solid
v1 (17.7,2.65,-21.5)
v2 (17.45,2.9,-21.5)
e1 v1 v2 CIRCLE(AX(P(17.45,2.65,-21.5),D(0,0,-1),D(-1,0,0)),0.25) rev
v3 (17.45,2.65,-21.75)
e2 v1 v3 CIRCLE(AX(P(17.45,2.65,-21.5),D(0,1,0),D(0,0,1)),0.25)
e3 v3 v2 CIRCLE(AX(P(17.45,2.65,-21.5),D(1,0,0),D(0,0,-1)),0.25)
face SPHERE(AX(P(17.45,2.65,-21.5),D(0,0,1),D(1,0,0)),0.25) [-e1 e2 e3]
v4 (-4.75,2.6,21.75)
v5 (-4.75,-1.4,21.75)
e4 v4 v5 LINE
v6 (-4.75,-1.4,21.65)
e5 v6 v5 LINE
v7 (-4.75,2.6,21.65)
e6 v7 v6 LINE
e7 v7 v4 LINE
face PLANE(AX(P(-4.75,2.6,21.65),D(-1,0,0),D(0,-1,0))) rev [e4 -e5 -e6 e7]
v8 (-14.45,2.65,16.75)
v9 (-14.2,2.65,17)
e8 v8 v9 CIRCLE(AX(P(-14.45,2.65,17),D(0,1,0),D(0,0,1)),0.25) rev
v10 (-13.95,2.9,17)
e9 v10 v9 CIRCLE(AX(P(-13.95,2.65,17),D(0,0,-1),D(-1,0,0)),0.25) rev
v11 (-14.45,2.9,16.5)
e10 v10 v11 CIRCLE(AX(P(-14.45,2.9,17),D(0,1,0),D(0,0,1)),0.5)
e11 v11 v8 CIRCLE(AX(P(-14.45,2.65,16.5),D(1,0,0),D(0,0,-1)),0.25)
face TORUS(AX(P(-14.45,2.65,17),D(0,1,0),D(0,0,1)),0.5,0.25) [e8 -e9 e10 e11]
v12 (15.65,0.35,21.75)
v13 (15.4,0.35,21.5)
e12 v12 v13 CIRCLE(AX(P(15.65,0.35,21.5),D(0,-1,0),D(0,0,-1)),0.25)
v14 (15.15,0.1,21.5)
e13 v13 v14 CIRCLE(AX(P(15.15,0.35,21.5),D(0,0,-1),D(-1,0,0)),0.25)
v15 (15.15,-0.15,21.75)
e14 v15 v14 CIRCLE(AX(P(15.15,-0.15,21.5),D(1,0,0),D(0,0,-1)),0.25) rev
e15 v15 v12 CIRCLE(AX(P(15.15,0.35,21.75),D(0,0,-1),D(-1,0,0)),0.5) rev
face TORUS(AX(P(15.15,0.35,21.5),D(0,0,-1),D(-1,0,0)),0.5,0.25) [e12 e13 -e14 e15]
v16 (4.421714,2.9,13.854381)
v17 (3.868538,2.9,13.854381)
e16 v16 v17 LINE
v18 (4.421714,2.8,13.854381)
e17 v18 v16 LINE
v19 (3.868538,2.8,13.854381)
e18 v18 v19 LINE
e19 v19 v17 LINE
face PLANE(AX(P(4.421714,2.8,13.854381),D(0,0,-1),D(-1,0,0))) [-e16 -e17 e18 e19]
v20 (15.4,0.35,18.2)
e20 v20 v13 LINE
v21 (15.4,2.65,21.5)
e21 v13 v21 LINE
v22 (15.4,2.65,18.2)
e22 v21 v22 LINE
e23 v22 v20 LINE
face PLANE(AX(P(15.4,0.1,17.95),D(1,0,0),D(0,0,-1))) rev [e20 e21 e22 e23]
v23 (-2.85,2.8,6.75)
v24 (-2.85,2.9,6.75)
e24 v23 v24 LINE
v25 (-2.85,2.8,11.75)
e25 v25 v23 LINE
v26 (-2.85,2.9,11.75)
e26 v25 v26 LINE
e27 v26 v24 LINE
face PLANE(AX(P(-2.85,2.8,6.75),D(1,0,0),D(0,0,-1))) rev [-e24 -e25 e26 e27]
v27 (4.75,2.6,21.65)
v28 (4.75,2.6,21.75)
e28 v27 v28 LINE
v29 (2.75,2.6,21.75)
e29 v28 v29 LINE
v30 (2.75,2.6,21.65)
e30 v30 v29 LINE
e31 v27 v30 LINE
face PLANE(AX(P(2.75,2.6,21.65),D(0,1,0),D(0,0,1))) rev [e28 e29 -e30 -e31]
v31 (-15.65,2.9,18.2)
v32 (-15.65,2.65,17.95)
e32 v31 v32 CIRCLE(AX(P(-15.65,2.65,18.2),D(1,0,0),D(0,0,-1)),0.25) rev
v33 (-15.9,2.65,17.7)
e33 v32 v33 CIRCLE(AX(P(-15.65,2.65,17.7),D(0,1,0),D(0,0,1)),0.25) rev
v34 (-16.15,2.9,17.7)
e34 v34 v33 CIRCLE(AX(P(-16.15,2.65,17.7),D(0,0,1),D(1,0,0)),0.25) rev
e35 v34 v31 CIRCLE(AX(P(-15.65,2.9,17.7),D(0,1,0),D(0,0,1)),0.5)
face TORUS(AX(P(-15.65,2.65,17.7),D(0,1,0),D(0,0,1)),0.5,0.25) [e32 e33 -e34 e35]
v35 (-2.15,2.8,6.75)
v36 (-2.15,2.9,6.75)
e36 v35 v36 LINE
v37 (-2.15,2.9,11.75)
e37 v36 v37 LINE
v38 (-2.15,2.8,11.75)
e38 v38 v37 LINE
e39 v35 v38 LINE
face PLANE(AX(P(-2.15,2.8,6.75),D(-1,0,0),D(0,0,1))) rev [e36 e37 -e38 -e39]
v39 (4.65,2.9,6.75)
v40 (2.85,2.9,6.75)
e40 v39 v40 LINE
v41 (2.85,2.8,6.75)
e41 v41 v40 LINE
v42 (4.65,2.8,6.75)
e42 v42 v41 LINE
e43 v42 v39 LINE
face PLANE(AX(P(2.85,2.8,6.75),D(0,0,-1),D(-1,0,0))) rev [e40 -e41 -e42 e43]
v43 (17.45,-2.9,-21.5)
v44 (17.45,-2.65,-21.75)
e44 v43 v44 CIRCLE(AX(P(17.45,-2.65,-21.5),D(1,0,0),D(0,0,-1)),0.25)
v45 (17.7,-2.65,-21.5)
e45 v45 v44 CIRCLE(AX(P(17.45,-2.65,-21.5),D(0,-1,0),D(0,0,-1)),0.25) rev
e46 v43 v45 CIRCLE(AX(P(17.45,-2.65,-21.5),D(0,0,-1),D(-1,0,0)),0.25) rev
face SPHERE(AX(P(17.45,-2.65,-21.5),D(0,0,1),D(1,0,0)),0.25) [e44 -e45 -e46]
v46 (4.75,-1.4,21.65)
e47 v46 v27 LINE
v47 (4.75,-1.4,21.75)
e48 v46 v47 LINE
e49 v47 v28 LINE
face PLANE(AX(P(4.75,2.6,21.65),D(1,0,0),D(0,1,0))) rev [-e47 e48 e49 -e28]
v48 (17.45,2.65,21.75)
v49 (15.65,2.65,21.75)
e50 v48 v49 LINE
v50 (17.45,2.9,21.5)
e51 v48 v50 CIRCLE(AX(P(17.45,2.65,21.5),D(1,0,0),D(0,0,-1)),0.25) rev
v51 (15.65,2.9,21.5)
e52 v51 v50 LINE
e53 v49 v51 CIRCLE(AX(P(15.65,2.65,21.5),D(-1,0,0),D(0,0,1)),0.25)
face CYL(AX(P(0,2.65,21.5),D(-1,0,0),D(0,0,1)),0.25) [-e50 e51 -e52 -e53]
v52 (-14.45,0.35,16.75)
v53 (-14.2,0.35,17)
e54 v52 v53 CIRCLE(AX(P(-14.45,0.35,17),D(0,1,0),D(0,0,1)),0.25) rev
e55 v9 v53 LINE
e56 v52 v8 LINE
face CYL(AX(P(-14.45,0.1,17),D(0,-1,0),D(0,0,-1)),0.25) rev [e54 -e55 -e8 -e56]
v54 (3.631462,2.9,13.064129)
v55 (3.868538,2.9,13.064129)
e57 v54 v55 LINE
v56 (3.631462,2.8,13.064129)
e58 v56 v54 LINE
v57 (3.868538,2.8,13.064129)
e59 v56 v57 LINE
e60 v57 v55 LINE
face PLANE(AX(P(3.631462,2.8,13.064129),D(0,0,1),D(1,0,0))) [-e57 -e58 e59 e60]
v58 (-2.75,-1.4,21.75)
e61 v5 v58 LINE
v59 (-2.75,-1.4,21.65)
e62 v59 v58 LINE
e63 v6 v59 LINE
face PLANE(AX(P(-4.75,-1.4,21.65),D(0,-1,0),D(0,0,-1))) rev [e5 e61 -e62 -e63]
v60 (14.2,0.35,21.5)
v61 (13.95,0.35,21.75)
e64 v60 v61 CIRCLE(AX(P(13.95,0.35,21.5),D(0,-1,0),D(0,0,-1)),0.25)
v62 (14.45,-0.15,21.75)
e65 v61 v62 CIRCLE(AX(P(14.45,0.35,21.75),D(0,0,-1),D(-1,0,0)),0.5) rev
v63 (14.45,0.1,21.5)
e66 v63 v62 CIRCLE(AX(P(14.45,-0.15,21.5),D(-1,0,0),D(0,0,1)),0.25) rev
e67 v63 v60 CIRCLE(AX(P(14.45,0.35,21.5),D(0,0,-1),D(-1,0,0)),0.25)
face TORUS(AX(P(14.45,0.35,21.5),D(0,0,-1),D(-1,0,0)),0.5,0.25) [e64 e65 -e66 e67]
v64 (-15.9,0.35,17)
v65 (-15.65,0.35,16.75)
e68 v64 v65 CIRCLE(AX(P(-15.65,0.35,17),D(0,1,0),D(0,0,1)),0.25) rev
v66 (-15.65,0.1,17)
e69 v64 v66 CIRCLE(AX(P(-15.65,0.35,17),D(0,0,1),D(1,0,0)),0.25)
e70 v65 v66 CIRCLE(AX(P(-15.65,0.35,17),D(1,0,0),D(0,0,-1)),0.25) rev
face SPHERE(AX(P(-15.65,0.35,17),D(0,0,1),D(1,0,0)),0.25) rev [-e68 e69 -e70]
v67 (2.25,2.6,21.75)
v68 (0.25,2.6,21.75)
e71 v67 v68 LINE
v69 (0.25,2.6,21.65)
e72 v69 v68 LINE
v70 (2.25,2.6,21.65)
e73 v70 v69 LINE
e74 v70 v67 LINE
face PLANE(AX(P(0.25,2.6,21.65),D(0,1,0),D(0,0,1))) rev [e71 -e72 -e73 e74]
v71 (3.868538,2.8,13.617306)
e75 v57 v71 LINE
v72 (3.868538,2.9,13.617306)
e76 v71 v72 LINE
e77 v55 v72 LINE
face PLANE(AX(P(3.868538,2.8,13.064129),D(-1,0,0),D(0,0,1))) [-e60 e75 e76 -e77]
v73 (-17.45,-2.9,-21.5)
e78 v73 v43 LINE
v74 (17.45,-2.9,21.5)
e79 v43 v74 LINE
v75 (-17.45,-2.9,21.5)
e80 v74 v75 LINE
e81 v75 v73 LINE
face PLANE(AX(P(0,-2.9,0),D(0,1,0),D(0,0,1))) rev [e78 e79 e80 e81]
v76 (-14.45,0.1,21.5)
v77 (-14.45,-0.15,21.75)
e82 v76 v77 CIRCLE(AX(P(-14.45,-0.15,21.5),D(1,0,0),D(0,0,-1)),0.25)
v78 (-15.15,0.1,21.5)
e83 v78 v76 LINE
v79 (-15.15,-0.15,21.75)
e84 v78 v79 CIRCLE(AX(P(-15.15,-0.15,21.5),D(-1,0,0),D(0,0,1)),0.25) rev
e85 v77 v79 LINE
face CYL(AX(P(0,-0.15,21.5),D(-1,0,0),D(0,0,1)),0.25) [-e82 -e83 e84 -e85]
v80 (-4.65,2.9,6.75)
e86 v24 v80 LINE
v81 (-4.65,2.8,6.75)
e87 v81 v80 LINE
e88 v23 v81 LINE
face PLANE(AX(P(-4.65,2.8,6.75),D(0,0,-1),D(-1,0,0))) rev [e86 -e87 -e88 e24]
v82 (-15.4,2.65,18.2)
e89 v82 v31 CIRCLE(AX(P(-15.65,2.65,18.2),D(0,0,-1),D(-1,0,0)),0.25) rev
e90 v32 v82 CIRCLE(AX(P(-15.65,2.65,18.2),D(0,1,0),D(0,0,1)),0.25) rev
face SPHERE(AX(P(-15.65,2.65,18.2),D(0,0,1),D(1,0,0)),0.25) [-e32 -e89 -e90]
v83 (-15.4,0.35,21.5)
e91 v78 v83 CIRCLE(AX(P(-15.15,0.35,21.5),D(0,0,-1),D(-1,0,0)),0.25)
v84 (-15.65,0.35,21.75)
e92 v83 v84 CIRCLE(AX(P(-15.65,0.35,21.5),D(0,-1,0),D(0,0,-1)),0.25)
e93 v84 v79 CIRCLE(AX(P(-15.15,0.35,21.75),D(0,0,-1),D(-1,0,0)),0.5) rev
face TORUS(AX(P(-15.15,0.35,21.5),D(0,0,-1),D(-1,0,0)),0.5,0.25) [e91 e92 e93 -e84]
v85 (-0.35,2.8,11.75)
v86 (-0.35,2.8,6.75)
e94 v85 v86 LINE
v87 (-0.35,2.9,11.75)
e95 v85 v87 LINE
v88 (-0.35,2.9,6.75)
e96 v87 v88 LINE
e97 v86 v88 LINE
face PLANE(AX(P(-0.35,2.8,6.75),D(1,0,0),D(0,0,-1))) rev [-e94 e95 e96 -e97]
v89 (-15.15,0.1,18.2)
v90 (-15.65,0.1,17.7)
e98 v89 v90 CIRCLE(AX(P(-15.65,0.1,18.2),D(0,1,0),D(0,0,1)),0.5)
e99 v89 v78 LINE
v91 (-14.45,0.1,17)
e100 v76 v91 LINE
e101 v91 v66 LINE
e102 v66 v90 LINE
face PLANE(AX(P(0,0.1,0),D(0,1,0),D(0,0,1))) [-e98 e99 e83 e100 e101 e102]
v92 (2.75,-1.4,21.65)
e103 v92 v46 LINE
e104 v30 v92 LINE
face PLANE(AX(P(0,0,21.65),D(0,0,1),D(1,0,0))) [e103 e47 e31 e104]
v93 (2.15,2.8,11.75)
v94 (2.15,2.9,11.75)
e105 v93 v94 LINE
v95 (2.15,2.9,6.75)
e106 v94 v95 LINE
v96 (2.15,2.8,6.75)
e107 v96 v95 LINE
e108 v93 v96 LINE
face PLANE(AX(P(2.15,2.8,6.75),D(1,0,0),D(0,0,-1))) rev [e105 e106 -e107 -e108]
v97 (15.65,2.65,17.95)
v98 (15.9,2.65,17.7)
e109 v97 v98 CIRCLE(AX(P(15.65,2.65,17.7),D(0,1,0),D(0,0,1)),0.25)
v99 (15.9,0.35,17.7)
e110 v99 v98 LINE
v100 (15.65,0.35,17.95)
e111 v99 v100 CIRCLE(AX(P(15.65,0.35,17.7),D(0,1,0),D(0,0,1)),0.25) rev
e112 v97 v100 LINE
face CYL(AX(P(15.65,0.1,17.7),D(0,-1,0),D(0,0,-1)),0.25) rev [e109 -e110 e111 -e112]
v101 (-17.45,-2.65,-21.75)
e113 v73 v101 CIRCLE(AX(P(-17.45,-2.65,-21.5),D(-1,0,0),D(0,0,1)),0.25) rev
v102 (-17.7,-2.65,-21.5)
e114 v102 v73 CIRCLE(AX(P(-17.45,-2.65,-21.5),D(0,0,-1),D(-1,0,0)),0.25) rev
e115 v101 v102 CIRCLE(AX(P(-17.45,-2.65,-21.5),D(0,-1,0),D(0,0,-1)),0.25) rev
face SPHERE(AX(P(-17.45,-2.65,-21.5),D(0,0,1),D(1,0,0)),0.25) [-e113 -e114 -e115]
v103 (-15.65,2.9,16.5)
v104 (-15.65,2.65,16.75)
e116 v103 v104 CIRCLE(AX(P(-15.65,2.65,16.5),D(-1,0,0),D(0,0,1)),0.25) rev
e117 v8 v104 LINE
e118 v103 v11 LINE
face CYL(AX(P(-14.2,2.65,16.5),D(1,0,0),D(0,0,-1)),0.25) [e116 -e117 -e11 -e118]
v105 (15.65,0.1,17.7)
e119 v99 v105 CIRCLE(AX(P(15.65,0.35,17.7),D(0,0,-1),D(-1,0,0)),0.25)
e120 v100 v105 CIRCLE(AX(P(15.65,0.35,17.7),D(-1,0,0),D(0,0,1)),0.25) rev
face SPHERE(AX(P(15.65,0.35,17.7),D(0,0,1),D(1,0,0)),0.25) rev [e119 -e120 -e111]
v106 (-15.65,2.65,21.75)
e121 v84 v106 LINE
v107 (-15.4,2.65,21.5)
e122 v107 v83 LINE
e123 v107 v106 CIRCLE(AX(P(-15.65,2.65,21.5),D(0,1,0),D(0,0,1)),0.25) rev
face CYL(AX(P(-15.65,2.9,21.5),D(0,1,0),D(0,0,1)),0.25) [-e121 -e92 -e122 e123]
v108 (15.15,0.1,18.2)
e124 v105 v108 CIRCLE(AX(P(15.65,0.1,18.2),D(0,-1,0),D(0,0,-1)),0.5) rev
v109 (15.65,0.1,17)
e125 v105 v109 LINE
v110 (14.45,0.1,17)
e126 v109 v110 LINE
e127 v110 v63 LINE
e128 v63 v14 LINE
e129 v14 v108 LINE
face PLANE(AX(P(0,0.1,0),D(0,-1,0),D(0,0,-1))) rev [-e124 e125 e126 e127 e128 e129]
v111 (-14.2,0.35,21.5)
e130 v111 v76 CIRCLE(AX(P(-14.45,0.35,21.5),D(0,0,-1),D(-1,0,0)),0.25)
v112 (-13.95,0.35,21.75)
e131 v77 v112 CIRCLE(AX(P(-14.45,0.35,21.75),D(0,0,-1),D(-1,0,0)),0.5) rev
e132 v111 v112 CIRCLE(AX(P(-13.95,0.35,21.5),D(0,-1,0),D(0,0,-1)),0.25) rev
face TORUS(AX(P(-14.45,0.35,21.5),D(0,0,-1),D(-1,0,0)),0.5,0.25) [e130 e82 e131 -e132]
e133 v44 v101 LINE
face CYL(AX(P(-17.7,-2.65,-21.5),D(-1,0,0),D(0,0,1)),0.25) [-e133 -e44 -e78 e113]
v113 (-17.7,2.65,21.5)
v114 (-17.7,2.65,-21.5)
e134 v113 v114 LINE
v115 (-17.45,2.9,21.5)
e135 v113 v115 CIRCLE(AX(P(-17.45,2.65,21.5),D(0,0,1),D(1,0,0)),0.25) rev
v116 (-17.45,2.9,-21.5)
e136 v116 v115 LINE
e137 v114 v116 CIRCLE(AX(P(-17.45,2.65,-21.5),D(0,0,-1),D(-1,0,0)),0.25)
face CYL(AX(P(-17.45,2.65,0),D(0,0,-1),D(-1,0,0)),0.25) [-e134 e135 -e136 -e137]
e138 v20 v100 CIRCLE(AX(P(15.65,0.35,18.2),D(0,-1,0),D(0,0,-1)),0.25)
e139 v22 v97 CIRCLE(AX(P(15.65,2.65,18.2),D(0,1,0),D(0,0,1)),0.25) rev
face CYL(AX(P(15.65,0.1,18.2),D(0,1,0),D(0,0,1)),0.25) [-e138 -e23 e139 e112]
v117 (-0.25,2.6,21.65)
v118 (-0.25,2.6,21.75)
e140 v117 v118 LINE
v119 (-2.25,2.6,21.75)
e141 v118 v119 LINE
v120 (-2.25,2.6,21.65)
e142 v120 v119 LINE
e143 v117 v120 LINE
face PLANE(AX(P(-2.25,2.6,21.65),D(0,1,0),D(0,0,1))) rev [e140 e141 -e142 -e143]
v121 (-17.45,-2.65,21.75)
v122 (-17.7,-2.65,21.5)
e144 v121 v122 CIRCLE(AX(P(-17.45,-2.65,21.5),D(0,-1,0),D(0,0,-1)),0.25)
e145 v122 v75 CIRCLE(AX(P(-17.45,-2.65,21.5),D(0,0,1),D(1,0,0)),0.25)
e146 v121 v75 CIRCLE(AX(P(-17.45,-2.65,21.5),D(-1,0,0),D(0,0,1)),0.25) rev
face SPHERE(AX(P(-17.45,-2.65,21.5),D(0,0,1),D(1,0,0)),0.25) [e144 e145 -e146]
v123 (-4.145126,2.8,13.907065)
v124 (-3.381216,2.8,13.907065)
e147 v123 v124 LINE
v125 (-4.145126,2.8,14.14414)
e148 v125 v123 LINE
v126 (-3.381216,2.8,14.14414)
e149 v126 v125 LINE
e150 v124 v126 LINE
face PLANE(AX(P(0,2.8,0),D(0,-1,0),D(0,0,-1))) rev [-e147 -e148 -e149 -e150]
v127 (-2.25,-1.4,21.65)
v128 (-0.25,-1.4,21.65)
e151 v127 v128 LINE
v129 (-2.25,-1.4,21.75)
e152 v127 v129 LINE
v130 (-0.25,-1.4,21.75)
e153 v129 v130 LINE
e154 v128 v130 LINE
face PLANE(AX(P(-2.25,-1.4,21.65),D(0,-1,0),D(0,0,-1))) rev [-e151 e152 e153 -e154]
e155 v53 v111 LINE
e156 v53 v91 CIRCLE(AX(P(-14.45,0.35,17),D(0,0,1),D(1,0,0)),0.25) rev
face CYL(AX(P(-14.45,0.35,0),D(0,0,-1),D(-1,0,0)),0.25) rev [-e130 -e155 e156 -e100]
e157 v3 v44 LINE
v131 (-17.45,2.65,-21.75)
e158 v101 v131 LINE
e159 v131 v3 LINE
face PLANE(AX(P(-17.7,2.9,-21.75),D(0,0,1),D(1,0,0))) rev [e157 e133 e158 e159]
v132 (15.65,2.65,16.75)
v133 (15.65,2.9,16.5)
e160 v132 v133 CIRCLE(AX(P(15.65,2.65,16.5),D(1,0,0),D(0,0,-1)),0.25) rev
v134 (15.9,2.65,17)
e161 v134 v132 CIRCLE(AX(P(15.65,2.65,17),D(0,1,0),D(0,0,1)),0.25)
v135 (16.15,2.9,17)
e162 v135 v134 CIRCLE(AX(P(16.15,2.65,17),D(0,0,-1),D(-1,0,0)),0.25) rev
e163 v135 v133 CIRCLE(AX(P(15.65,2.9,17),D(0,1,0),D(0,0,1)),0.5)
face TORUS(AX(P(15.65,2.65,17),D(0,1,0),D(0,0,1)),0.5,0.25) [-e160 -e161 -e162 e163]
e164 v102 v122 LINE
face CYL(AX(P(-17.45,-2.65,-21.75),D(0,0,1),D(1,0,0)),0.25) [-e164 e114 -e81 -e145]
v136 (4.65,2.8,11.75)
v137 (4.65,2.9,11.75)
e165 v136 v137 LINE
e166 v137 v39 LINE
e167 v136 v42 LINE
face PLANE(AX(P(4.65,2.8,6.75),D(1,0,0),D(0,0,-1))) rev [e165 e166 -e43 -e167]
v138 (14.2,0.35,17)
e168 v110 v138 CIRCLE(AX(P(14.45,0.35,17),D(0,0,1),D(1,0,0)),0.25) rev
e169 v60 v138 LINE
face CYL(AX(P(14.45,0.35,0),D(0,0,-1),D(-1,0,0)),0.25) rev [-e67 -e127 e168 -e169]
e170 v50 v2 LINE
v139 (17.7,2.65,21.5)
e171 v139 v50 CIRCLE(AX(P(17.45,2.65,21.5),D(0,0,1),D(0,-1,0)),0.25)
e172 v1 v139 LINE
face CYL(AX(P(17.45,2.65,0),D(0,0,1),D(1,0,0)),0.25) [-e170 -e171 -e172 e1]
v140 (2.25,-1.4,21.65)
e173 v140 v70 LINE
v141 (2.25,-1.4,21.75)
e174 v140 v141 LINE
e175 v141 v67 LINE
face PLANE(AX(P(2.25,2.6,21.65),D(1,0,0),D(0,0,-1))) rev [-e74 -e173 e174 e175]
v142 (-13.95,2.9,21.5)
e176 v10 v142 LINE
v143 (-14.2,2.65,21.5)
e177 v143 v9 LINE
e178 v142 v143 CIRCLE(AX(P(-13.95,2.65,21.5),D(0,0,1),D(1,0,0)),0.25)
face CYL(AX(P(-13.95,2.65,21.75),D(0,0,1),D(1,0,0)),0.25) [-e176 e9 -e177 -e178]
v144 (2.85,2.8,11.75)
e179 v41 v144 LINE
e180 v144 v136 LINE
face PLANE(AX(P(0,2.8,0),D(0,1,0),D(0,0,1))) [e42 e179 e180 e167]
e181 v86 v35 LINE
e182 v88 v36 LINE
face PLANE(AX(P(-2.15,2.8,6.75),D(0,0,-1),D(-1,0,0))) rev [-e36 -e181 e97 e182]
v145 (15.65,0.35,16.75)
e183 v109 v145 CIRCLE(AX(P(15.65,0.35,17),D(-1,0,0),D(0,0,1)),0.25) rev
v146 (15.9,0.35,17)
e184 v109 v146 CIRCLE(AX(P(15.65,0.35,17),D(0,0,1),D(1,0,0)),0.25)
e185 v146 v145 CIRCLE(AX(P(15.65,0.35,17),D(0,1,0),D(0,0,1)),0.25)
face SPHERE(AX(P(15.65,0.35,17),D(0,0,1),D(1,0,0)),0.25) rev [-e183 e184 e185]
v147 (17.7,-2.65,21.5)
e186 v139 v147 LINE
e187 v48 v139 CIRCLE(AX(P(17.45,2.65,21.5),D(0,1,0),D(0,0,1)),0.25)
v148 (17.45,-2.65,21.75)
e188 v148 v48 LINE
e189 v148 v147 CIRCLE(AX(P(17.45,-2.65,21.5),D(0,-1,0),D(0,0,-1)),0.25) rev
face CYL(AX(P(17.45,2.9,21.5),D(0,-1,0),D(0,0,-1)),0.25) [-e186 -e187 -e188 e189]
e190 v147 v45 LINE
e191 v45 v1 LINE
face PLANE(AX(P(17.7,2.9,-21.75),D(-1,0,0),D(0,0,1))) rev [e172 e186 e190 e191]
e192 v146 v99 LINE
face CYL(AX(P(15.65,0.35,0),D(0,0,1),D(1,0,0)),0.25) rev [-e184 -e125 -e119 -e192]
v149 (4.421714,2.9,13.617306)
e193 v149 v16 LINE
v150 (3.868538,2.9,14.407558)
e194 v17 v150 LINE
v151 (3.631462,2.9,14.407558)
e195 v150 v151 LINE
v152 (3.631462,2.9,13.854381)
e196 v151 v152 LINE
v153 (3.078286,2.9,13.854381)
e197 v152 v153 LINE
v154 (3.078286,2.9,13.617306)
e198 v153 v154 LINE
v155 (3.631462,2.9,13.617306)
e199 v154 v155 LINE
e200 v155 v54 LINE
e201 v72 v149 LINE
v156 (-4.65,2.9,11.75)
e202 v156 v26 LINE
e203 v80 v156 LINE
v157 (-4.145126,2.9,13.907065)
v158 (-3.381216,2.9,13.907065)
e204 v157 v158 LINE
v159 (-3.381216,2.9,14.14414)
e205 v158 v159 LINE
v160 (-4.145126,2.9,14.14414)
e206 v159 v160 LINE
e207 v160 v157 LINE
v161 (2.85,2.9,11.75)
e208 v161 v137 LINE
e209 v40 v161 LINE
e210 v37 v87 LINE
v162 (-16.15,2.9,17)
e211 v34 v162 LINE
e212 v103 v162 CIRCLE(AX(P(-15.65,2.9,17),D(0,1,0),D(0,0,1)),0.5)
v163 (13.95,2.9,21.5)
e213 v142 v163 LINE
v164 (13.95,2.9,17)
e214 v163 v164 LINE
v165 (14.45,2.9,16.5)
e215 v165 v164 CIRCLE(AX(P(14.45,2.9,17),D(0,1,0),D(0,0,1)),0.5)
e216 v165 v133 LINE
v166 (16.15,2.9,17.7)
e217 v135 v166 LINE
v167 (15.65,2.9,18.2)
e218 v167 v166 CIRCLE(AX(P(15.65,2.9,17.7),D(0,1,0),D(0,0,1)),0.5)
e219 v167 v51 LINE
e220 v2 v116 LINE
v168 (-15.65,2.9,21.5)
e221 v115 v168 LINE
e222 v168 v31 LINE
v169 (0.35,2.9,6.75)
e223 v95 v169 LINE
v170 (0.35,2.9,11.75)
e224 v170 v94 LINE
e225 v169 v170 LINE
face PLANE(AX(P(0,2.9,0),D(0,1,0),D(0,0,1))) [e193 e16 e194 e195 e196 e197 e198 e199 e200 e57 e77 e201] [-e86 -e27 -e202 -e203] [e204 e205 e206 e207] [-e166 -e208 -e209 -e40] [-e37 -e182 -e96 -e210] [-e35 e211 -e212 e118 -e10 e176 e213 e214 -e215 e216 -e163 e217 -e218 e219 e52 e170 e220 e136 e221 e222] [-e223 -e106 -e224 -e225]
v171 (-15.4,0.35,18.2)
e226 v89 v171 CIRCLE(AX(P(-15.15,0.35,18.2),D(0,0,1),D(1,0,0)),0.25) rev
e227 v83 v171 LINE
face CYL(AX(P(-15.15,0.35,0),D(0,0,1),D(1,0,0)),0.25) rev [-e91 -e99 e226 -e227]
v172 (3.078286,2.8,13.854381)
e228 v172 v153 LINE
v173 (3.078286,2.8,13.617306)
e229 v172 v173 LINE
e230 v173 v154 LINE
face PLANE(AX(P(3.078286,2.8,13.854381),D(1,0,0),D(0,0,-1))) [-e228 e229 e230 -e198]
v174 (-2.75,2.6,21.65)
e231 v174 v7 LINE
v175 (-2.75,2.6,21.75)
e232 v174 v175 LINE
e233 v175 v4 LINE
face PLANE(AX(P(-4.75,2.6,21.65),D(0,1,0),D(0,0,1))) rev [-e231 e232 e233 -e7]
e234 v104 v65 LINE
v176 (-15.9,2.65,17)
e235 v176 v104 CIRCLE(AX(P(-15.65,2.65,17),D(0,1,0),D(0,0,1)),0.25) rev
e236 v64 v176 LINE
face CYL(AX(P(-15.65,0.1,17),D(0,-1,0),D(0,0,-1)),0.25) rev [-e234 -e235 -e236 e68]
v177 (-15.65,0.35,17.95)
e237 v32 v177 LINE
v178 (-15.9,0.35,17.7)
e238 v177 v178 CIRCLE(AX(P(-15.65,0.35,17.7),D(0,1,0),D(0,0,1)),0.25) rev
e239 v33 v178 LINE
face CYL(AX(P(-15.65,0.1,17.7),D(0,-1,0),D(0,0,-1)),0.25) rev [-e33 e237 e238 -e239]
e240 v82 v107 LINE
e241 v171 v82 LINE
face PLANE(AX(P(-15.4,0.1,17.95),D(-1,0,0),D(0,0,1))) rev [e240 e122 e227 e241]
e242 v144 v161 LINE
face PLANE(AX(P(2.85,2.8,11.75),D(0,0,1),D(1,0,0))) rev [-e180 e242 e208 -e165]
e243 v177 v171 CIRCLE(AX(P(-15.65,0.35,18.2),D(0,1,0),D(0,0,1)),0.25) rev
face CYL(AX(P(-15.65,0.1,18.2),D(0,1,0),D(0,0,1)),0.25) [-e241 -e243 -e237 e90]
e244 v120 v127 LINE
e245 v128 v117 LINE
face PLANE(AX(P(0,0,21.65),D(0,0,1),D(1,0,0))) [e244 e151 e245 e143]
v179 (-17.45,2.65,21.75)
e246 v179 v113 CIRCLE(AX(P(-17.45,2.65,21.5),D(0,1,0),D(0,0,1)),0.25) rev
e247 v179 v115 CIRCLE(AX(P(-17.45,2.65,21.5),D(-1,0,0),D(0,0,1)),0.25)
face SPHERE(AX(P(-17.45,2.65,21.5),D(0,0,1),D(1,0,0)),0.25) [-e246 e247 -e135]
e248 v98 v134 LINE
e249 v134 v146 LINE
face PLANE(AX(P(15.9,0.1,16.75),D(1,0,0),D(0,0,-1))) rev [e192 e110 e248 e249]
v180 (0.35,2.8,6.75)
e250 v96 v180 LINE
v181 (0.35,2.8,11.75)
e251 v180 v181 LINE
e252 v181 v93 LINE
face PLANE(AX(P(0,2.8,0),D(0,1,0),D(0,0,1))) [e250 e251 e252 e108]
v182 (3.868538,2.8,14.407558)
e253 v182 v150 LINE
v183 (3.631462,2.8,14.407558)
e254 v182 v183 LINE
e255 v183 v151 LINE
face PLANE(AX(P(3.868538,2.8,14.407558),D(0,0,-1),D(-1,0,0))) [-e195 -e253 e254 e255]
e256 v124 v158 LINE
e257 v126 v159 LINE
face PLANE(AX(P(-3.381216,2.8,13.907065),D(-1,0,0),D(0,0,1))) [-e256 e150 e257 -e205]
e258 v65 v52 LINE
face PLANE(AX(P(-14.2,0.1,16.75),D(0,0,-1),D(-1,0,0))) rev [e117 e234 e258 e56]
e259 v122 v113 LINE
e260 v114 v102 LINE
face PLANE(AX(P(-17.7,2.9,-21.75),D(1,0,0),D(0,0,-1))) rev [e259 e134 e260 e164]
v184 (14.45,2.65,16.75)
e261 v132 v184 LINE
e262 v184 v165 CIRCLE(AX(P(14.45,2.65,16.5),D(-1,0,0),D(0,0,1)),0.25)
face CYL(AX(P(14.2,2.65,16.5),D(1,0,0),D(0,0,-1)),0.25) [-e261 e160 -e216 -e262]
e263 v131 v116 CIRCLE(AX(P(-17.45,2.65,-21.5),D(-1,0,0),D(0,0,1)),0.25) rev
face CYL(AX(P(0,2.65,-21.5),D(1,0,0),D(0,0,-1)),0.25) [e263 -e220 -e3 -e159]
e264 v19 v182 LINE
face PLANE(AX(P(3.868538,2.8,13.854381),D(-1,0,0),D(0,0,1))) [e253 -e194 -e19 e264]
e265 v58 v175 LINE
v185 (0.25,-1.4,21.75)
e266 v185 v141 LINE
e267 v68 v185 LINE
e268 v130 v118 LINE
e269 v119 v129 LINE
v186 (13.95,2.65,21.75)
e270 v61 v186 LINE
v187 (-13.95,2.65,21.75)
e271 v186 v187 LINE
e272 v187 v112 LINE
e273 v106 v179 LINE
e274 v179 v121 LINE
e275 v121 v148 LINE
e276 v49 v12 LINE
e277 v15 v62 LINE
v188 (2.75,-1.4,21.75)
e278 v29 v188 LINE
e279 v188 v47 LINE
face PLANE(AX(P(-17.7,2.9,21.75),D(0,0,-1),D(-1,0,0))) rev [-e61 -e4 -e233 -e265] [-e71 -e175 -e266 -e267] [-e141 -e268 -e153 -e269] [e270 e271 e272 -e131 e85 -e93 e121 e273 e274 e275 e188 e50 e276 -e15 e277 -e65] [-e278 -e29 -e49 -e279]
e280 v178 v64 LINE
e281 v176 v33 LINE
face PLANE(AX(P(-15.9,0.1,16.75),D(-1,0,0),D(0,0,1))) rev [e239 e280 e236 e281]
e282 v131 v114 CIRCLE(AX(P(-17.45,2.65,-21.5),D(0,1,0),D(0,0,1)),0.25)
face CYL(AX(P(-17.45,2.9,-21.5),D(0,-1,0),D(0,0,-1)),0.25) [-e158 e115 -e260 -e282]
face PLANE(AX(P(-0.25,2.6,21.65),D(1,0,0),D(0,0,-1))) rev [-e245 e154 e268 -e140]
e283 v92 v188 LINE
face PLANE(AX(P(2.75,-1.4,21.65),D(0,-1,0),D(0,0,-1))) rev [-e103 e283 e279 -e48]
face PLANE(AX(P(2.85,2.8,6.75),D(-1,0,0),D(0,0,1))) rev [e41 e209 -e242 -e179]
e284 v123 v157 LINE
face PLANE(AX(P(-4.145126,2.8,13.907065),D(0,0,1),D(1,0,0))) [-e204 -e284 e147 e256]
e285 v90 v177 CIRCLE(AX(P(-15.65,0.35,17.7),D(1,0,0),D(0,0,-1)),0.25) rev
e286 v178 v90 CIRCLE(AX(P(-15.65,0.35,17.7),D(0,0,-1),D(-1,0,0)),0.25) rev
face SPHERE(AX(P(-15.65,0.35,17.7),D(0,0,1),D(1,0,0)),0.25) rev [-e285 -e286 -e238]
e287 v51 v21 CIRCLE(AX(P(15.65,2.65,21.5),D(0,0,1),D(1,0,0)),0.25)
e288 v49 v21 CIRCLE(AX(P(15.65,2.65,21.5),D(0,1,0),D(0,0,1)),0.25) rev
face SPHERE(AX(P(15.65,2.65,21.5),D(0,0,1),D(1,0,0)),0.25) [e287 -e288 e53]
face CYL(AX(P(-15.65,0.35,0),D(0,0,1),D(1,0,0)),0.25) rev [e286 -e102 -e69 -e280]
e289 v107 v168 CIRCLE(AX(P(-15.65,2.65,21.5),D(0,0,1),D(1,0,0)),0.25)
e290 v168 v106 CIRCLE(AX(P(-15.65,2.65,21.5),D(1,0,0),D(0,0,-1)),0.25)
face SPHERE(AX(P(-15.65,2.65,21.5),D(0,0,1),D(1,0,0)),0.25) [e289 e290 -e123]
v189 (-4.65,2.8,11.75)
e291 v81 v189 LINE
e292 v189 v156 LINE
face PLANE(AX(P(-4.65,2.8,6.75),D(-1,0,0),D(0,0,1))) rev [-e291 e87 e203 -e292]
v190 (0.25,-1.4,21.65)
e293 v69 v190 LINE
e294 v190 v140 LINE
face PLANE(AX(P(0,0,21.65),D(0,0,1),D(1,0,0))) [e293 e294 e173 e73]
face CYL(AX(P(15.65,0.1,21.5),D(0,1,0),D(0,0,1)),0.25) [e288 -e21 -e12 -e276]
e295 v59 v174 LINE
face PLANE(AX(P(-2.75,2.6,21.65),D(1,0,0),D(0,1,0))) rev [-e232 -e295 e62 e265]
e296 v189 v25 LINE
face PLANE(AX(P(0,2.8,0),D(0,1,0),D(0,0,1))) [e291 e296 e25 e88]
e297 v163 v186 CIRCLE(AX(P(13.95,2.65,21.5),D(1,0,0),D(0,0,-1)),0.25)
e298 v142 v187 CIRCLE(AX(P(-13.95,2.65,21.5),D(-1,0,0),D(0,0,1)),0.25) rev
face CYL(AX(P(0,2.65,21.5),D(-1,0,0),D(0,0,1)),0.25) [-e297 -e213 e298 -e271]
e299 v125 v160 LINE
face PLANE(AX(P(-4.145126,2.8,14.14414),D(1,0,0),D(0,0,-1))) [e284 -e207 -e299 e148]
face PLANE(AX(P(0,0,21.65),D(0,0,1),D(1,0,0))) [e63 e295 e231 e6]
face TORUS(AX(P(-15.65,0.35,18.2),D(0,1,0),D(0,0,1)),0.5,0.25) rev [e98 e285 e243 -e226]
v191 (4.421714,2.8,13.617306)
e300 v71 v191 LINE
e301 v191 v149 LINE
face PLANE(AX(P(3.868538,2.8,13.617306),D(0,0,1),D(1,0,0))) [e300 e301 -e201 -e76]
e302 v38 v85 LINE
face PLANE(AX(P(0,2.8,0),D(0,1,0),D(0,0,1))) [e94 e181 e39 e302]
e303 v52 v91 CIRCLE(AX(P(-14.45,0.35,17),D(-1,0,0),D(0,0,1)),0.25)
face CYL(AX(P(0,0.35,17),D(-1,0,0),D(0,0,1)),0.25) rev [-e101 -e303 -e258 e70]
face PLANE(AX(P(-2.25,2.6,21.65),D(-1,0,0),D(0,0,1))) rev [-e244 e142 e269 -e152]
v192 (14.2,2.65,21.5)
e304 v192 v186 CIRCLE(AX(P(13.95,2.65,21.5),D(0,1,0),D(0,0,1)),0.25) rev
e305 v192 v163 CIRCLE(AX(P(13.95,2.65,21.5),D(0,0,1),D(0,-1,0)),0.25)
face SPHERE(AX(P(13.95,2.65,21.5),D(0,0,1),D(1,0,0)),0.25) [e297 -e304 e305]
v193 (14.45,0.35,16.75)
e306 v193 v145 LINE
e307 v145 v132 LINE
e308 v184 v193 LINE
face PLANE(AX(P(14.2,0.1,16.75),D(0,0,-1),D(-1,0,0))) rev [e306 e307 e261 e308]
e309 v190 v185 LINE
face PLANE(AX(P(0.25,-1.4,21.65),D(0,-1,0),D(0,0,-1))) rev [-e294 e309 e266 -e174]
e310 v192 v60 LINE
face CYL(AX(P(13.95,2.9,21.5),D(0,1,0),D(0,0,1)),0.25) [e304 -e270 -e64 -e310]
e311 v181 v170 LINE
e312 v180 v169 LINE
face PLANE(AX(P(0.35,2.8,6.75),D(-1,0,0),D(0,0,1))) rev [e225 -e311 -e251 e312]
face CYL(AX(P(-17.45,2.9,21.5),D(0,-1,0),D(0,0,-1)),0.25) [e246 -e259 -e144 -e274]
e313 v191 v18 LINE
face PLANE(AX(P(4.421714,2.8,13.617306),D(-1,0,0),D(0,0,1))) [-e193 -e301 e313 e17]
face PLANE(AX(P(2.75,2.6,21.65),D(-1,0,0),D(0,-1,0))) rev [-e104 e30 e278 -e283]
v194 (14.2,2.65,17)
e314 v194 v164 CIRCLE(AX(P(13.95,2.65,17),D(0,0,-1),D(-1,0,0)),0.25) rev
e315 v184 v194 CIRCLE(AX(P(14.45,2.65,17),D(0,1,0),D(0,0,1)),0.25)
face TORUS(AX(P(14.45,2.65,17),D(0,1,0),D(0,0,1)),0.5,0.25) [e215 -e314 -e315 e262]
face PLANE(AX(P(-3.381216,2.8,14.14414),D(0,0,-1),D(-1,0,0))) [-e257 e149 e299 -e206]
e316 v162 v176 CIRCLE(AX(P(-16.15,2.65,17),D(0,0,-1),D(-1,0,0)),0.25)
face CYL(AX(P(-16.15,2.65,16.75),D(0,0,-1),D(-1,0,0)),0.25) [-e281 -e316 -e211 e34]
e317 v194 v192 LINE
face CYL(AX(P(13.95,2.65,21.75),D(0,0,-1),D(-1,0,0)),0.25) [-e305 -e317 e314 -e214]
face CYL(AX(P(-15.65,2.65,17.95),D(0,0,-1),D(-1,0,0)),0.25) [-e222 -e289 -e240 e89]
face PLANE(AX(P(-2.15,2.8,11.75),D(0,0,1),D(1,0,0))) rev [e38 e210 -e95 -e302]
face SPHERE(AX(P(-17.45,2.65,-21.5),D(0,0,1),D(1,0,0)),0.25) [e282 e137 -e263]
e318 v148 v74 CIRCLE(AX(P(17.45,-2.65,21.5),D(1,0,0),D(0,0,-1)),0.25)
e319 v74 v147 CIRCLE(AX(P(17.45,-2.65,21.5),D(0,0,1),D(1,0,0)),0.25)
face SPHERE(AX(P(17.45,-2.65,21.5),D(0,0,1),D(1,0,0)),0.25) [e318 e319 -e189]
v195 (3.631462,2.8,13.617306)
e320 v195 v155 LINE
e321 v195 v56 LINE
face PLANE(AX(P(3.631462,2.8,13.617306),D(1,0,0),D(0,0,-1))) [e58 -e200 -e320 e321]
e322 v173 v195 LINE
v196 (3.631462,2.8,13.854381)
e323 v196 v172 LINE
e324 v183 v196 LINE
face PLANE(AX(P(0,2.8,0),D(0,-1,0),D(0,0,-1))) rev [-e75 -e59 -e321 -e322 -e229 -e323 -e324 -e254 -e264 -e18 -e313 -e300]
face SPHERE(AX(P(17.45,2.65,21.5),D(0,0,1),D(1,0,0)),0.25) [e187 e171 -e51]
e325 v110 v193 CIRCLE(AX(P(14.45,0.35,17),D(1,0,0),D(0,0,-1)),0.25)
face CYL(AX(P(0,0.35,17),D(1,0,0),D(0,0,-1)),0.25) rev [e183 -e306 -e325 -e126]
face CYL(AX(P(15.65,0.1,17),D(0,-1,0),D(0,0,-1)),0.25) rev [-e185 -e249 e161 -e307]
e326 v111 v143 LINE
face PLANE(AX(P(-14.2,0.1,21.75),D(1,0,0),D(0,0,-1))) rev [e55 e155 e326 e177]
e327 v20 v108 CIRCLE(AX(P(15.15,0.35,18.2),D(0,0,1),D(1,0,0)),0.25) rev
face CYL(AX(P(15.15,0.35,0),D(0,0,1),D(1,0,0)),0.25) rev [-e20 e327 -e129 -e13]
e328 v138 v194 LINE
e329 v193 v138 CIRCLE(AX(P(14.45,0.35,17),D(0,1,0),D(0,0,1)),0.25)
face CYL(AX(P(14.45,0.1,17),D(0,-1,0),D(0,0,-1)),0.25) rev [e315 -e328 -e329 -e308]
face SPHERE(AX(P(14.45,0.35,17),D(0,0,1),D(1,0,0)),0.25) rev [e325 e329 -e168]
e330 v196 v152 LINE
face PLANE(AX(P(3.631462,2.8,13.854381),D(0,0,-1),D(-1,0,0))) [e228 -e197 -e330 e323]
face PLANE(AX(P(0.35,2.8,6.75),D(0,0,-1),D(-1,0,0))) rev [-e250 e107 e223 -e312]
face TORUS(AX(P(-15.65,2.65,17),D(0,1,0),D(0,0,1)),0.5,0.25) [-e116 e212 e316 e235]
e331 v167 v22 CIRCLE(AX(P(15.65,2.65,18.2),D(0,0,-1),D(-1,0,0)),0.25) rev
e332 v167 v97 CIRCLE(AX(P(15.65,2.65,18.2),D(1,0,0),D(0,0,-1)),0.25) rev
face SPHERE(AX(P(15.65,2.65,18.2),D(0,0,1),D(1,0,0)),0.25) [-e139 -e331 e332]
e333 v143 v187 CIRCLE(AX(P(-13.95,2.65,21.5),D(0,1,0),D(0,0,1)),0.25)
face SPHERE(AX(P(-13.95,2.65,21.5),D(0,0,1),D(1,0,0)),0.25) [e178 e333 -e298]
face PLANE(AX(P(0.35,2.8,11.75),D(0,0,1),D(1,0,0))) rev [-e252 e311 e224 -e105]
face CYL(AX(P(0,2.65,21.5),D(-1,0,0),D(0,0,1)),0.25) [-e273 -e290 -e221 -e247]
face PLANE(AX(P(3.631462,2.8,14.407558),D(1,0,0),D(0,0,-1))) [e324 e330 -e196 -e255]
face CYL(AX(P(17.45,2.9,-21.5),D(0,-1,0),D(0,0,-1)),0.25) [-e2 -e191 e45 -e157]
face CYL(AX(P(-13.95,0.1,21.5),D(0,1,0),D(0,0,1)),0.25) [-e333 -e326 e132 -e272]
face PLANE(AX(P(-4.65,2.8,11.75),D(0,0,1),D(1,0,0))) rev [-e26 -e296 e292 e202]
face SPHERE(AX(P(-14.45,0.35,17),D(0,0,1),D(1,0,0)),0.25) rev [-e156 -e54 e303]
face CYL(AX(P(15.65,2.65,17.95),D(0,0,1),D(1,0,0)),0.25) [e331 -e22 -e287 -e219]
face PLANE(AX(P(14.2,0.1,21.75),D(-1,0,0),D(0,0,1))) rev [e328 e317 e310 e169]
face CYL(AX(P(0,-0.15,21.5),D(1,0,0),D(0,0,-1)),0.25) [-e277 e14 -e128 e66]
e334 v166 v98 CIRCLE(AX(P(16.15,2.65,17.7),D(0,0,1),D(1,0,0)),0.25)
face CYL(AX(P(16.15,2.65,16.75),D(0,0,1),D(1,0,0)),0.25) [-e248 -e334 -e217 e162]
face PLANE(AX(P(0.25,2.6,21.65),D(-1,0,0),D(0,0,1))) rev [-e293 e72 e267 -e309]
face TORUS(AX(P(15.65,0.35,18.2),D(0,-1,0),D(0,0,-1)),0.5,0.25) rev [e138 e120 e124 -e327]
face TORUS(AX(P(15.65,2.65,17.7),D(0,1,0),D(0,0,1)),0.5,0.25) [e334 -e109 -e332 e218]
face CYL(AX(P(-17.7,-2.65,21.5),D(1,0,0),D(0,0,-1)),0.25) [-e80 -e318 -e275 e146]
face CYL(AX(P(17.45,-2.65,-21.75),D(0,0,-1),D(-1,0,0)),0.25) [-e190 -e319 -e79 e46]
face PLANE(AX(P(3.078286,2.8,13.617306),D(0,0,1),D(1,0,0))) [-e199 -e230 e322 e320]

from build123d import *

# Parameters (mm, degrees)
SKETCH1_W           = 35.4
SKETCH1_H           = 43.5
BOSS_EXTRUDE1_DEPTH = 2.9
CUT_EXTRUDE1_DEPTH  = 2.8
SKETCH3_W           = 1.8
SKETCH3_H           = 5
SKETCH3_W_2         = 0.763910173
SKETCH3_H_2         = 0.237075571
CUT_EXTRUDE2_DEPTH  = 0.1
SKETCH4_W           = 2
SKETCH4_H           = 4
CUT_EXTRUDE3_DEPTH  = 0.1
FILLET1_R           = 0.25


with BuildPart() as part:
    # Sketch1 → Boss-Extrude1 (new, symmetric)
    with BuildSketch(Plane(origin=(0, 0, 0), x_dir=(1, 0, 0), z_dir=(0, 1, 0))):
        Rectangle(SKETCH1_W, SKETCH1_H)
    extrude(amount=BOSS_EXTRUDE1_DEPTH, both=True)

    # Sketch2 → Cut-Extrude1 (cut)
    with BuildSketch(Plane(origin=(0, 2.9, 0), x_dir=(1, 0, 0), z_dir=(0, 1, 0))):
        Polygon((-14.2, -21.75), (-14.2, -16.75), (-15.9, -16.75), (-15.9, -17.95), (-15.4, -17.95), (-15.4, -21.75), align=None)
        Polygon((15.4, -21.75), (14.2, -21.75), (14.2, -16.75), (15.9, -16.75), (15.9, -17.95), (15.4, -17.95), align=None)
    extrude(amount=-CUT_EXTRUDE1_DEPTH, mode=Mode.SUBTRACT)

    # Sketch3 → Cut-Extrude2 (cut)
    with BuildSketch(Plane(origin=(0, 2.9, 0), x_dir=(1, 0, 0), z_dir=(0, 1, 0))):
        with Locations((-3.75, -9.25)):
            Rectangle(SKETCH3_W, SKETCH3_H)
        with Locations((-1.25, -9.25)):
            Rectangle(SKETCH3_W, SKETCH3_H)
        with Locations((1.25, -9.25)):
            Rectangle(SKETCH3_W, SKETCH3_H)
        with Locations((3.75, -9.25)):
            Rectangle(SKETCH3_W, SKETCH3_H)
        with Locations((-3.763170866, -14.025602423)):
            Rectangle(SKETCH3_W_2, SKETCH3_H_2)
        Polygon((3.631462215, -14.407557509), (3.631462215, -13.854381177), (3.078285882, -13.854381177), (3.078285882, -13.617305606), (3.631462215, -13.617305606), (3.631462215, -13.064129274), (3.868537785, -13.064129274), (3.868537785, -13.617305606), (4.421714118, -13.617305606), (4.421714118, -13.854381177), (3.868537785, -13.854381177), (3.868537785, -14.407557509), align=None)
    extrude(amount=-CUT_EXTRUDE2_DEPTH, mode=Mode.SUBTRACT)

    # Sketch4 → Cut-Extrude3 (cut)
    with BuildSketch(Plane.XY.offset(21.75)):
        with Locations((-3.75, 0.6)):
            Rectangle(SKETCH4_W, SKETCH4_H)
        with Locations((-1.25, 0.6)):
            Rectangle(SKETCH4_W, SKETCH4_H)
        with Locations((1.25, 0.6)):
            Rectangle(SKETCH4_W, SKETCH4_H)
        with Locations((3.75, 0.6)):
            Rectangle(SKETCH4_W, SKETCH4_H)
    extrude(amount=-CUT_EXTRUDE3_DEPTH, mode=Mode.SUBTRACT)

    # Fillet1
    fillet1_edges = [part.edges().sort_by_distance(p)[0] for p in [
        (17.7, 2.9, 0),
        (0, 2.9, -21.75),
        (0, 2.9, 21.75),
        (-14.8, 0.1, 21.75),
        (-14.2, 1.5, 21.75),
        (-15.4, 0.1, 19.85),
        (-15.4, 1.5, 21.75),
        (-15.65, 0.1, 17.95),
        (-15.4, 1.5, 17.95),
        (-15.9, 0.1, 17.35),
        (-15.9, 1.5, 17.95),
        (-15.05, 0.1, 16.75),
        (-15.9, 1.5, 16.75),
        (-14.2, 0.1, 19.25),
        (-14.2, 1.5, 16.75),
        (-14.2, 2.9, 19.25),
        (-15.05, 2.9, 16.75),
        (-15.9, 2.9, 17.35),
        (-15.65, 2.9, 17.95),
        (-15.4, 2.9, 19.85),
        (16.55, 2.9, 21.75),
        (15.4, 0.1, 19.85),
        (15.4, 1.5, 17.95),
        (14.8, 0.1, 21.75),
        (15.4, 1.5, 21.75),
        (14.2, 0.1, 19.25),
        (14.2, 1.5, 21.75),
        (15.05, 0.1, 16.75),
        (14.2, 1.5, 16.75),
        (15.9, 0.1, 17.35),
        (15.9, 1.5, 16.75),
        (15.65, 0.1, 17.95),
        (15.9, 1.5, 17.95),
        (15.4, 2.9, 19.85),
        (15.65, 2.9, 17.95),
        (15.9, 2.9, 17.35),
        (15.05, 2.9, 16.75),
        (14.2, 2.9, 19.25),
        (-17.7, 2.9, 0),
        (0, -2.9, -21.75),
        (17.7, -2.9, 0),
        (0, -2.9, 21.75),
        (-17.7, -2.9, 0),
        (-16.55, 2.9, 21.75),
        (-17.7, 0, -21.75),
        (17.7, 0, -21.75),
        (17.7, 0, 21.75),
        (-17.7, 0, 21.75),
    ]]
    fillet(fillet1_edges, radius=FILLET1_R - 0.0001)  # a hair under: the kernel refuses the full size


solid = part.part
